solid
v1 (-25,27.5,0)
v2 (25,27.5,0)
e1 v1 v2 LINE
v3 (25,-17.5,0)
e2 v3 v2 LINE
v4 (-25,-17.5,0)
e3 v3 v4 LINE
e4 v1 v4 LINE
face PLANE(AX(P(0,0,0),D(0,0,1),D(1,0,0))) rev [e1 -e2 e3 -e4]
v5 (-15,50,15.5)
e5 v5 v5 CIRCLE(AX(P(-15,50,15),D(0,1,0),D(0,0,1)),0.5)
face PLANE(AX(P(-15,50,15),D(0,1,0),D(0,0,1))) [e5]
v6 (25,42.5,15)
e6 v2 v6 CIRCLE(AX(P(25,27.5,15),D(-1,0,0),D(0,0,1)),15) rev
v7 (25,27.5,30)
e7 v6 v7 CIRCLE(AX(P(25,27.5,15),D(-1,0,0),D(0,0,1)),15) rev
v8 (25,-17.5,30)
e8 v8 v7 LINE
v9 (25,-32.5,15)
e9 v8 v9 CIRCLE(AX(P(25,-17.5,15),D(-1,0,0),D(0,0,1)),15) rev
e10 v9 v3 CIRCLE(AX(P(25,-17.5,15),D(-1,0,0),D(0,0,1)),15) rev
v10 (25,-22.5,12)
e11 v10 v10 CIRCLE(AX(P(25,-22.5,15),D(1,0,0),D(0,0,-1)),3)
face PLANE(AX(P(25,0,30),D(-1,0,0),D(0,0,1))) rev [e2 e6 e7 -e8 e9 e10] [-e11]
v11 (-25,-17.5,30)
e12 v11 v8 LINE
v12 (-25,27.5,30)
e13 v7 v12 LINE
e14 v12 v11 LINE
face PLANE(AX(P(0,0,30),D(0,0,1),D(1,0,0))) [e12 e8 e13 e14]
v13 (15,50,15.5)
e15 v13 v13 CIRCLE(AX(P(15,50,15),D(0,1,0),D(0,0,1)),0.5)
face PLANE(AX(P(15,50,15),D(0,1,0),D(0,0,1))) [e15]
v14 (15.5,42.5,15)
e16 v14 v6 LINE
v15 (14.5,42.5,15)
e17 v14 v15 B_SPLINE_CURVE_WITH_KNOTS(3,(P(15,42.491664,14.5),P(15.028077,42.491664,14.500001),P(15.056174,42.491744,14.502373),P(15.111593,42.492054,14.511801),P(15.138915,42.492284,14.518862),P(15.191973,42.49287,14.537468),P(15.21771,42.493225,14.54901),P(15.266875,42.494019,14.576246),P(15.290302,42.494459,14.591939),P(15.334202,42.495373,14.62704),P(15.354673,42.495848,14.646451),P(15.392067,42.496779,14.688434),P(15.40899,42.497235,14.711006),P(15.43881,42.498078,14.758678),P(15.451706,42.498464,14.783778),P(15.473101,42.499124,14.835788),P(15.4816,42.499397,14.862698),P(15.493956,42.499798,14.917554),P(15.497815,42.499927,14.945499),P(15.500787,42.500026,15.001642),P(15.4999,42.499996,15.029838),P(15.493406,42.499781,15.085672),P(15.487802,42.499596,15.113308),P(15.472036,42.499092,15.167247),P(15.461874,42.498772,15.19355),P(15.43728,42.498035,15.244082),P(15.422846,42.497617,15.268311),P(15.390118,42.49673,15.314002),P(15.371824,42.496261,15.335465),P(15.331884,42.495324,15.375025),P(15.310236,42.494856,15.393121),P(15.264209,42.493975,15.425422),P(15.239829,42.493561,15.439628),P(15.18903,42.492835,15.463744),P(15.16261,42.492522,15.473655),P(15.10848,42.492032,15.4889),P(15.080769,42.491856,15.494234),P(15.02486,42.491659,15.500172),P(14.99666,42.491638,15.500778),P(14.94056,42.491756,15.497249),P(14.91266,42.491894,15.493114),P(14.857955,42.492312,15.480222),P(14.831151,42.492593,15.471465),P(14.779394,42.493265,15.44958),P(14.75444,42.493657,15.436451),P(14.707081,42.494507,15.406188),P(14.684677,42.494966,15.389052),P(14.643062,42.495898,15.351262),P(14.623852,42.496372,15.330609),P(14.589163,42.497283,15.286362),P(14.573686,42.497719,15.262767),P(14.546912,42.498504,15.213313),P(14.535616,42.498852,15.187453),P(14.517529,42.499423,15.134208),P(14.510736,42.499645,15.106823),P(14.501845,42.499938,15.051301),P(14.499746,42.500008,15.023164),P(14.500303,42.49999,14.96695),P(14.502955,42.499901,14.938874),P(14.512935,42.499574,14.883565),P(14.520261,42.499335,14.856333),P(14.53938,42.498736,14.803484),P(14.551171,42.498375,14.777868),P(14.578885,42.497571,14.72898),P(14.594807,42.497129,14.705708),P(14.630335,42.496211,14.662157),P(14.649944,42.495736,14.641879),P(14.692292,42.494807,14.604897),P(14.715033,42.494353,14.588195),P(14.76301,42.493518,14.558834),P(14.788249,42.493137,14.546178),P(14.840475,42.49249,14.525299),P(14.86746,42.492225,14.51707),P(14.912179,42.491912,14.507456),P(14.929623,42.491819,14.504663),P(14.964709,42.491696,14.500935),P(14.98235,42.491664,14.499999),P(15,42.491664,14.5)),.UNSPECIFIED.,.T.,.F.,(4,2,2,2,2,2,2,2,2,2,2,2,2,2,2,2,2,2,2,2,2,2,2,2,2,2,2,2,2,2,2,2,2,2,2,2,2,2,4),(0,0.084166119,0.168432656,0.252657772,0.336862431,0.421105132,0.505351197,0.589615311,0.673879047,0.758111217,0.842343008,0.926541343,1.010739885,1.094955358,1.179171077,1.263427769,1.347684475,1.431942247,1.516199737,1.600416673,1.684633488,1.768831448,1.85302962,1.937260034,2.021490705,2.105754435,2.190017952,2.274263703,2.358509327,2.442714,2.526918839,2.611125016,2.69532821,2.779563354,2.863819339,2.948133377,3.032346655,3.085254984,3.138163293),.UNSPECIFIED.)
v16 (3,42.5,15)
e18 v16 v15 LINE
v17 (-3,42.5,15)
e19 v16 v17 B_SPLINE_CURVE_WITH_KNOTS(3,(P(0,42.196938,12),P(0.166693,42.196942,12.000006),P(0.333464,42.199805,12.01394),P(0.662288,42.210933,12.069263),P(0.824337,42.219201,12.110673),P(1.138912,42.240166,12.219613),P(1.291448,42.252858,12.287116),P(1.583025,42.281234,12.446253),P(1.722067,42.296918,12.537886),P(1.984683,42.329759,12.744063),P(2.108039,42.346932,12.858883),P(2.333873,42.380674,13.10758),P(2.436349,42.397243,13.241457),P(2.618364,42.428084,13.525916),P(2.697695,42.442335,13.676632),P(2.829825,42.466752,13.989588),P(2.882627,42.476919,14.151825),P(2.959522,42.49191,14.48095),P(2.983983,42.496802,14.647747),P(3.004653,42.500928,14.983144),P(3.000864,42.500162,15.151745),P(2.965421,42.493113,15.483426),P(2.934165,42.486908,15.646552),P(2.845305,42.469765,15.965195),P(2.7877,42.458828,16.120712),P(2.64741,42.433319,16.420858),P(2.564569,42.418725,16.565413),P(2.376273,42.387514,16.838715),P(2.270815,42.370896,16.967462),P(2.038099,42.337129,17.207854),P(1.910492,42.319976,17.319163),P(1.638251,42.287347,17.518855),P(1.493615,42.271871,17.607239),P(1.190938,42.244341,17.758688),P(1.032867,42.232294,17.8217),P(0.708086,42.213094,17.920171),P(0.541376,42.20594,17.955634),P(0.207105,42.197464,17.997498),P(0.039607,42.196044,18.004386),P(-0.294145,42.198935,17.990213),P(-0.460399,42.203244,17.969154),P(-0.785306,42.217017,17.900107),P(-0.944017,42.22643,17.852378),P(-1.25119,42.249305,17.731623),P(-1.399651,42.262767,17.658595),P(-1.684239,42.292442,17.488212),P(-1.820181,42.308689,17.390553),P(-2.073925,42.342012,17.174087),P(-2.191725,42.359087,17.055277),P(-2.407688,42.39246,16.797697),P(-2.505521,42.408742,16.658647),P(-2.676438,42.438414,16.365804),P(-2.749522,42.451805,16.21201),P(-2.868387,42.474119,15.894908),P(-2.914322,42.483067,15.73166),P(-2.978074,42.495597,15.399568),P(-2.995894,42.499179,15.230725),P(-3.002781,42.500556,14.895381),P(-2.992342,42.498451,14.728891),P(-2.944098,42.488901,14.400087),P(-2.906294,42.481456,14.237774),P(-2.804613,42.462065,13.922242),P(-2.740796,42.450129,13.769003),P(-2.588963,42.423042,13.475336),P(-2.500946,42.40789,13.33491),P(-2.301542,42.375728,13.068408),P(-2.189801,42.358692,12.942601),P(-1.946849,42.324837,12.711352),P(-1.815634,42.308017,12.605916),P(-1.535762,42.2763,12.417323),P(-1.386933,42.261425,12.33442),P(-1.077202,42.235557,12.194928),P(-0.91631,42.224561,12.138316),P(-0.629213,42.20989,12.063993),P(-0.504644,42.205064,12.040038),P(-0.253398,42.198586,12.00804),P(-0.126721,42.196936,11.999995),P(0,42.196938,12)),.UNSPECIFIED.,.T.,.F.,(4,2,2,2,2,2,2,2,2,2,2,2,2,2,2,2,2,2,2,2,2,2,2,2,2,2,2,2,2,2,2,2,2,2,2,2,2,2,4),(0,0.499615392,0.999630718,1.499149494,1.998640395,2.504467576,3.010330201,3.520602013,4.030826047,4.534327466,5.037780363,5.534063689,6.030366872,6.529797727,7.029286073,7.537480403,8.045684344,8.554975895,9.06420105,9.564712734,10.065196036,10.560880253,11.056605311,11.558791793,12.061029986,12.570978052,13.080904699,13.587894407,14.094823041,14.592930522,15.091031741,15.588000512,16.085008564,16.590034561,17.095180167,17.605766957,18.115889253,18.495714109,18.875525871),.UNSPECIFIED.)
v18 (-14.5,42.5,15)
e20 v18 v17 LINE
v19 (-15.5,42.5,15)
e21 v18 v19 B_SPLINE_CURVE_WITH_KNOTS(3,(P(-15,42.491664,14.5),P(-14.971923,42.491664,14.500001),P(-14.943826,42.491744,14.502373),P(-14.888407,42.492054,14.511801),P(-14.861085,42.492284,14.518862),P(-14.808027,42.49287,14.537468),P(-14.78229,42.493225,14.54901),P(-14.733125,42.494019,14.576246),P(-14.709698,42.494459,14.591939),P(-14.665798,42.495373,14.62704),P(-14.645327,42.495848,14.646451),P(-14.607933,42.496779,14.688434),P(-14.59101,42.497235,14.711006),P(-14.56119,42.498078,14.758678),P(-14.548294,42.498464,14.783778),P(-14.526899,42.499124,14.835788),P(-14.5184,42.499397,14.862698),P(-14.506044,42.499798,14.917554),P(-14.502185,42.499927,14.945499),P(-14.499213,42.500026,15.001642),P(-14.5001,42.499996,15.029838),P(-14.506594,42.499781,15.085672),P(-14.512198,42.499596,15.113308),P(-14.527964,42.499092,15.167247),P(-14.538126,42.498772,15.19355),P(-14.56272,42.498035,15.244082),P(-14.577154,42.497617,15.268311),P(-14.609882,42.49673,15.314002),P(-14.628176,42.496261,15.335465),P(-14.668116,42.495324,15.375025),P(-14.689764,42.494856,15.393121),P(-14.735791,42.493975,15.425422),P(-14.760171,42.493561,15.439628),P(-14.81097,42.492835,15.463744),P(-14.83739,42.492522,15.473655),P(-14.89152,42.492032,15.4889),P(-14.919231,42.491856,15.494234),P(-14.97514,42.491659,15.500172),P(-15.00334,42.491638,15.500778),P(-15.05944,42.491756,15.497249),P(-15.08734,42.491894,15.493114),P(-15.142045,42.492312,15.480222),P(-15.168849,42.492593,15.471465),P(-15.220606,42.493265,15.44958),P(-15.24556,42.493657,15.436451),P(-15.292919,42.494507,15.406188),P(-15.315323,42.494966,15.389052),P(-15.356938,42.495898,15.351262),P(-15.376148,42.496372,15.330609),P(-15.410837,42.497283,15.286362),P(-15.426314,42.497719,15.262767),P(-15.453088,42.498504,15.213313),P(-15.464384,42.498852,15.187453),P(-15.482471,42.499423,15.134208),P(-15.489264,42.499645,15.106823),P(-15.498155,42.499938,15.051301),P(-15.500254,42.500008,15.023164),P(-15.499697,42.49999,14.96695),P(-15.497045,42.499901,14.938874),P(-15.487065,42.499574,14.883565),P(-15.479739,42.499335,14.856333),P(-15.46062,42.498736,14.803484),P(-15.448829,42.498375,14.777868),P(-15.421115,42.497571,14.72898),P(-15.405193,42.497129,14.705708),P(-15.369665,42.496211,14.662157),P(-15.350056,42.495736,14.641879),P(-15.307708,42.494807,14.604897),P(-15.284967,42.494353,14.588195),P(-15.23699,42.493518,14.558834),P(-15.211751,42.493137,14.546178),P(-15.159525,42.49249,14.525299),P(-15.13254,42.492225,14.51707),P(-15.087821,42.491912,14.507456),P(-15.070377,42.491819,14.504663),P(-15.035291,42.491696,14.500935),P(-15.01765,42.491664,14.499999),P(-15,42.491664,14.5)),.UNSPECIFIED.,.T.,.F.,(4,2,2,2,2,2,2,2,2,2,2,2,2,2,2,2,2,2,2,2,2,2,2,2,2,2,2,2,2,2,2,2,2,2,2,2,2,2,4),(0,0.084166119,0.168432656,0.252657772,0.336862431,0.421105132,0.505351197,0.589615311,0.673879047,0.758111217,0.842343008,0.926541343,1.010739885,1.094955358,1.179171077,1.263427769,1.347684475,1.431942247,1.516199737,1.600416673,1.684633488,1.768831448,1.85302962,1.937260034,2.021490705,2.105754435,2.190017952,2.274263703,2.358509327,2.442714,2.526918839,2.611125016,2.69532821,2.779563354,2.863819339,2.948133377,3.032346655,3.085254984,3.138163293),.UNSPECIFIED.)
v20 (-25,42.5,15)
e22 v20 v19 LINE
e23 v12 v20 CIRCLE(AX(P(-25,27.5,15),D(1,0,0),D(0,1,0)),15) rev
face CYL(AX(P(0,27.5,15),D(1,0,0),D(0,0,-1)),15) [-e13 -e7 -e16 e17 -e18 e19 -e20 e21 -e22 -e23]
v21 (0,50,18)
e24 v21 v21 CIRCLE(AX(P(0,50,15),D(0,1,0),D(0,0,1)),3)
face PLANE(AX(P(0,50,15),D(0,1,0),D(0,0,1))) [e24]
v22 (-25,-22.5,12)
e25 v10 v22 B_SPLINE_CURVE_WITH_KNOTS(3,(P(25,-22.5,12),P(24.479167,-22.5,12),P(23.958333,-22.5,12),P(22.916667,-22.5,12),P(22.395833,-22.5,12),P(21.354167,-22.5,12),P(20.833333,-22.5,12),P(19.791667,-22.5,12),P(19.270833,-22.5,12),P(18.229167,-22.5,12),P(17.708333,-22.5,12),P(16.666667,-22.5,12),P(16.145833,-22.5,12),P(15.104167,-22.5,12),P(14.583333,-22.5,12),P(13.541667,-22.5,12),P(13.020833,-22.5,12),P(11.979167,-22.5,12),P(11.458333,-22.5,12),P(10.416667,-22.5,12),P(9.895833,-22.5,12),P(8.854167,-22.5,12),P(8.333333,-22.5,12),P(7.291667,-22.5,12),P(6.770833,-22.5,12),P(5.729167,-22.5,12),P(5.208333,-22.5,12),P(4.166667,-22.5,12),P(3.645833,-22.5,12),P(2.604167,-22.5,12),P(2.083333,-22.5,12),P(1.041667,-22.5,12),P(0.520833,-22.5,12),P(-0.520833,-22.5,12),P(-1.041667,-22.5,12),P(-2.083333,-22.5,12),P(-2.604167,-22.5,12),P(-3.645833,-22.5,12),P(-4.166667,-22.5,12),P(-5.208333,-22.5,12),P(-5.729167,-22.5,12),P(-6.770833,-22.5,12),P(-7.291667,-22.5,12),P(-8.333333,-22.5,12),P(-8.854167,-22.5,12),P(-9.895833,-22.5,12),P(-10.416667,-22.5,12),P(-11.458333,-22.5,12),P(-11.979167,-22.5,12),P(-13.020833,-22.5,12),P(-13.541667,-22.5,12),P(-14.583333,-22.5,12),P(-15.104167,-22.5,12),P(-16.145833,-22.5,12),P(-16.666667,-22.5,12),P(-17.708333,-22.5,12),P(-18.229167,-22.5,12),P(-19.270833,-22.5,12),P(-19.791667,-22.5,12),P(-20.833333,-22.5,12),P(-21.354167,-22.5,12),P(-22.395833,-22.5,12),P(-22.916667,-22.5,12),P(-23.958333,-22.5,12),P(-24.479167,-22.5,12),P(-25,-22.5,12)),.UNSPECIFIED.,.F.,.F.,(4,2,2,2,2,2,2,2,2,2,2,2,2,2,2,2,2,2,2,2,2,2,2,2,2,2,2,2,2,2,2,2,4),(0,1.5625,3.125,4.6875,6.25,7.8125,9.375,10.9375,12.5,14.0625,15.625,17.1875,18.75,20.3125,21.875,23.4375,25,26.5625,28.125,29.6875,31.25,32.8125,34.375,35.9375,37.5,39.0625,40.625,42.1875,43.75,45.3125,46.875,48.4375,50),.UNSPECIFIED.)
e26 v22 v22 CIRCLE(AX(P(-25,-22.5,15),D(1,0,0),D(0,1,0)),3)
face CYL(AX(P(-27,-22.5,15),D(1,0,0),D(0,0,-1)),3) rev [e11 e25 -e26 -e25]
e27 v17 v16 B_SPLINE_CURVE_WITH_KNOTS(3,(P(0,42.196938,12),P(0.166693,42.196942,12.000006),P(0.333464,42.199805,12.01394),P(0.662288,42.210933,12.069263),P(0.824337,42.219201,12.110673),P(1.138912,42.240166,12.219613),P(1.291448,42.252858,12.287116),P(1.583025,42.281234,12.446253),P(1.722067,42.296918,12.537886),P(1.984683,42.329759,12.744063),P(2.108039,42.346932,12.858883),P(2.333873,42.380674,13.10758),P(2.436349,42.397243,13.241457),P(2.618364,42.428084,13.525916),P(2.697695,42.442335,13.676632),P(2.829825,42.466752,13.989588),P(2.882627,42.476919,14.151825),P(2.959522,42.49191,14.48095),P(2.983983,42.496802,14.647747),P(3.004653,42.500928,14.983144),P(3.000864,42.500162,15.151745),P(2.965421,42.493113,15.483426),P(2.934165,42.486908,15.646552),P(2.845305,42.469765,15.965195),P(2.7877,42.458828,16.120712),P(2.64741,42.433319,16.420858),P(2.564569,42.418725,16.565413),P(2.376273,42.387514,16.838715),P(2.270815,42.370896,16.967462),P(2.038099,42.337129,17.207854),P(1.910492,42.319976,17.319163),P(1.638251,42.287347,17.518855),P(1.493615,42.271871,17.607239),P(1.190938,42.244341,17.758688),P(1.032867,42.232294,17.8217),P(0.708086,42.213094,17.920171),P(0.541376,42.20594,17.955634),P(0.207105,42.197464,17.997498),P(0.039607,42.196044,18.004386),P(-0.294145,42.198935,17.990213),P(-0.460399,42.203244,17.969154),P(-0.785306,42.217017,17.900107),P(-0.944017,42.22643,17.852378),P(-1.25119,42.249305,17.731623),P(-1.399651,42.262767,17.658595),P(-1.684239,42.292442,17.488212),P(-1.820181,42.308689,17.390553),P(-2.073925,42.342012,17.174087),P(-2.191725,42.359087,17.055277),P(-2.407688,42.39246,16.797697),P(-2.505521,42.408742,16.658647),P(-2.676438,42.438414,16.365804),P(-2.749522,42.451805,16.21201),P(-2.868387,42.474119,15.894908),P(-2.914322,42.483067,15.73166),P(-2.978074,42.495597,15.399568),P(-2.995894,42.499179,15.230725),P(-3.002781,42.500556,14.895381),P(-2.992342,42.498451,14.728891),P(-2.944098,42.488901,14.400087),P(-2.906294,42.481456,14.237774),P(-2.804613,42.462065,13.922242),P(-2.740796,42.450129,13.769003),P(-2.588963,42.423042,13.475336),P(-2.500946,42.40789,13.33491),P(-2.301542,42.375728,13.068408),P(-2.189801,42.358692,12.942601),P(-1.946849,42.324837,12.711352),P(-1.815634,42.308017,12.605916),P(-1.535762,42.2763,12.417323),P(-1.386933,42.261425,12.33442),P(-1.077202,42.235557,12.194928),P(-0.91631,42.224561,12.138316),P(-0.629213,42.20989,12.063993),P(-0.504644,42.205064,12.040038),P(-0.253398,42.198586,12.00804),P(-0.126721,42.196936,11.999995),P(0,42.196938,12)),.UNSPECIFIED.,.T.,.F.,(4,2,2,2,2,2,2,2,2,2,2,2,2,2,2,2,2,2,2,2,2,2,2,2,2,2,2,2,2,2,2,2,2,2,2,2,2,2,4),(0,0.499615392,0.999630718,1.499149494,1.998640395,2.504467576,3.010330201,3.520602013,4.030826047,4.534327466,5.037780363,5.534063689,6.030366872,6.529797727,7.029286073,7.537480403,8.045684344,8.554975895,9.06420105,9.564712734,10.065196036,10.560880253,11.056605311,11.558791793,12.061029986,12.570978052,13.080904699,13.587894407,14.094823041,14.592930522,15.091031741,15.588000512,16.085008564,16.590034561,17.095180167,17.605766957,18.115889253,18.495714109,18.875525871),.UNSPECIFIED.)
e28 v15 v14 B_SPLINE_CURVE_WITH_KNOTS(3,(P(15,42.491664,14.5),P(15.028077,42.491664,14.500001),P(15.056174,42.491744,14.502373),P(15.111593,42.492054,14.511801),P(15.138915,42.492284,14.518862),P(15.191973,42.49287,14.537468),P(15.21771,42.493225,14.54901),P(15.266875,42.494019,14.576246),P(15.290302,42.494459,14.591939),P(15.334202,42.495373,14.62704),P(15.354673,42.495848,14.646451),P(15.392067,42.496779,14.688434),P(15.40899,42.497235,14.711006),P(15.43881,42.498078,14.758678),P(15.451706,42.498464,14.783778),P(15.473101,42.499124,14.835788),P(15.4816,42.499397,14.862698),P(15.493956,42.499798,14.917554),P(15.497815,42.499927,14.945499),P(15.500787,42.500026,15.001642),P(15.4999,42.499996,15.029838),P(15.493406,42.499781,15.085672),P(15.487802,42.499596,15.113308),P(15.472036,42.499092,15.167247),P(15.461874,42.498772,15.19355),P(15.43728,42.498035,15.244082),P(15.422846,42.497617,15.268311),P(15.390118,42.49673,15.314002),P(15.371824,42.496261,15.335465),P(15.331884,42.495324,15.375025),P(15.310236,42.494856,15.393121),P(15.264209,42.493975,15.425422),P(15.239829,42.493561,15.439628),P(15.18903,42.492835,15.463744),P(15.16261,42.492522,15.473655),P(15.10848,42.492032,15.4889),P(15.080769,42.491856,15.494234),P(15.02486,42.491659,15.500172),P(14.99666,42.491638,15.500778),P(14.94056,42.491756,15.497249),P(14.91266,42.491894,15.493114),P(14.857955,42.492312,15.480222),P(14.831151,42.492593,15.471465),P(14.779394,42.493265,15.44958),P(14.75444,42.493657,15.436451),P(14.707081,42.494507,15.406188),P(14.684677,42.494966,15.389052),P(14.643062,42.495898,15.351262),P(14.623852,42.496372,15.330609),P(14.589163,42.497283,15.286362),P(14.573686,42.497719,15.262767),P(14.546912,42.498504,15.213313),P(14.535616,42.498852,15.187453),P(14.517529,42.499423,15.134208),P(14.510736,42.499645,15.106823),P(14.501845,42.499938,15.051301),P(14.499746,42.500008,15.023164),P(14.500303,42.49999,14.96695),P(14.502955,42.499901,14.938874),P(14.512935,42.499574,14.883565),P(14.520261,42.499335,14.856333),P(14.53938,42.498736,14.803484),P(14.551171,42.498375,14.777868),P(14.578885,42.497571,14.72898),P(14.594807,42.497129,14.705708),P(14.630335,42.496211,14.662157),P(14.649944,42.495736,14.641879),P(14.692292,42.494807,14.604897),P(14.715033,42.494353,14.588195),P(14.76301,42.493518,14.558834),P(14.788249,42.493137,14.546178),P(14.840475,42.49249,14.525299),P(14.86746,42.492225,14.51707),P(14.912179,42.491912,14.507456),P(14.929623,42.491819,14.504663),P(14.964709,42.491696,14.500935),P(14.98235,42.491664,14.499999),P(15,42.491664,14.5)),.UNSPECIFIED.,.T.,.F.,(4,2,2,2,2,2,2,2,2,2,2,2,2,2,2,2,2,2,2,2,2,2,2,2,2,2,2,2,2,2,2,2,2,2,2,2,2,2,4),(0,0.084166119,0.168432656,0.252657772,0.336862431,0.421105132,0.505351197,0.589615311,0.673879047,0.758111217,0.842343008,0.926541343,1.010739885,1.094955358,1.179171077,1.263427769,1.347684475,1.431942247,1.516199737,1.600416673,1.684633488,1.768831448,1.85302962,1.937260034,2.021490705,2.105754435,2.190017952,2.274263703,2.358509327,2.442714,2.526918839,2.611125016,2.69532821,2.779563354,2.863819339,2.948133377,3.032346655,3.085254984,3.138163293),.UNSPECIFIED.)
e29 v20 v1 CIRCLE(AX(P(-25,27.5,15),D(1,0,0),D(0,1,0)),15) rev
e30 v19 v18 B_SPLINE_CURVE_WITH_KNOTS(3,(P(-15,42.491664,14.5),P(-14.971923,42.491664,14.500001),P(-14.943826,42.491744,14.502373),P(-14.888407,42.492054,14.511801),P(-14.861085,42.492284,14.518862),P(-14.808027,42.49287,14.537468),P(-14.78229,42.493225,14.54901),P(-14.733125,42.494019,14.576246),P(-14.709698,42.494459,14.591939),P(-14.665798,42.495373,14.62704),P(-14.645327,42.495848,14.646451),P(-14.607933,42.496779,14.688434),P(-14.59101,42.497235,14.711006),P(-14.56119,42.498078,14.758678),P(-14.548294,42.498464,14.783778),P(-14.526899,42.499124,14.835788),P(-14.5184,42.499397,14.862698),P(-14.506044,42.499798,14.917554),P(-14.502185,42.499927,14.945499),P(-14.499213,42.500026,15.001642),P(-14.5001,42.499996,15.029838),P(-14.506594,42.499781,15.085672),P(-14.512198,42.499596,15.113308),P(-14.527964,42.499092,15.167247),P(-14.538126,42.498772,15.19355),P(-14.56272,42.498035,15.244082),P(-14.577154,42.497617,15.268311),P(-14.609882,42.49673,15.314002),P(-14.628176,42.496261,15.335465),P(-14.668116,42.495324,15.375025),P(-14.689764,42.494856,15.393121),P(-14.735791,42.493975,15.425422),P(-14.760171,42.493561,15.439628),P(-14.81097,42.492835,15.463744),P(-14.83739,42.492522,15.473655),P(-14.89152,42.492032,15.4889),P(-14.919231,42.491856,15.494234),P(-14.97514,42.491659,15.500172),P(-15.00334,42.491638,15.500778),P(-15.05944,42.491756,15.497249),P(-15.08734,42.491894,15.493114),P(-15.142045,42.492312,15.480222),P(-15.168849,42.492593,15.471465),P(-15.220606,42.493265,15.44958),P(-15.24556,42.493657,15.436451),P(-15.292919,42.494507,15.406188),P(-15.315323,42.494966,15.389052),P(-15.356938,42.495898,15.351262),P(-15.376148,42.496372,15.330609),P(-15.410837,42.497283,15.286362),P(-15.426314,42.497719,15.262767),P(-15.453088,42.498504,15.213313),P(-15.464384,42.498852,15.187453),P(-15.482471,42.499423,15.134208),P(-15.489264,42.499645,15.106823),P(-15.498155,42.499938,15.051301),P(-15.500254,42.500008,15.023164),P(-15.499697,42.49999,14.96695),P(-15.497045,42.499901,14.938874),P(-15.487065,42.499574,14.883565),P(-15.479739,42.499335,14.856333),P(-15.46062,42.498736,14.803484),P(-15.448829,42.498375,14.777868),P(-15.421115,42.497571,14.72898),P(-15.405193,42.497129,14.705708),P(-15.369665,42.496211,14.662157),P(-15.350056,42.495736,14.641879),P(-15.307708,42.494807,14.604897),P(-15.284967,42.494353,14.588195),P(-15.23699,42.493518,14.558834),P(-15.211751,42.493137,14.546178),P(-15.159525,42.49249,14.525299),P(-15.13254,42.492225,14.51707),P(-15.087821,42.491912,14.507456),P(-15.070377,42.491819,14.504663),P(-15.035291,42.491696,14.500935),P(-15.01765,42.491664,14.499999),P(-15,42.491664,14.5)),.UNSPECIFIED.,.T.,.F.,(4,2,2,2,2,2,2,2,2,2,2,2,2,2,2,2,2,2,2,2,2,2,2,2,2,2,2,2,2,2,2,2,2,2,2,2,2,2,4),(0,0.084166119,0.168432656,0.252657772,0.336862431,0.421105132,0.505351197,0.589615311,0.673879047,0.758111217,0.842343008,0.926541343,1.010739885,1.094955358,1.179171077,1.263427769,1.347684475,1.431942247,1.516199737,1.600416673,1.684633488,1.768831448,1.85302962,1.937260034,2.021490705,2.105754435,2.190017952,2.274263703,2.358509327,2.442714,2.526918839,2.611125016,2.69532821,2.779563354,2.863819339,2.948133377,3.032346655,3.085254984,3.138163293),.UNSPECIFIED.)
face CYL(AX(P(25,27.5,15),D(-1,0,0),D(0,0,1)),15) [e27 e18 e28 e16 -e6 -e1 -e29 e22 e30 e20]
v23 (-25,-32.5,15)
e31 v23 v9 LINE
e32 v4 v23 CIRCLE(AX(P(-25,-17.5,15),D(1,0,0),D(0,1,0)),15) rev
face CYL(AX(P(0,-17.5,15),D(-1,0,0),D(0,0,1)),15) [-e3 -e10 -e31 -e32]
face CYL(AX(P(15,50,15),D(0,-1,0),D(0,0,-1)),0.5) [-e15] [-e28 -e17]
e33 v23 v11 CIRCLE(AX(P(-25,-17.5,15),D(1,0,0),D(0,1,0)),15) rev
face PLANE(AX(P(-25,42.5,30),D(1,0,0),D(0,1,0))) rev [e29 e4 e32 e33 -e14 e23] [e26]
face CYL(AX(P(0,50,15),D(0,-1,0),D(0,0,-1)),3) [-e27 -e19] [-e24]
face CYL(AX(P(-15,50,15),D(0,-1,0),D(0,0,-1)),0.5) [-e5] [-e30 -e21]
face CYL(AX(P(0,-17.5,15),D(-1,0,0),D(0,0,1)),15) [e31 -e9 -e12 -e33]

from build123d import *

# Parameters (mm, degrees)
EXTRUDE_1_DEPTH     = 30
SKETCH_2_R          = 3
CUT_EXTRUDE_1_DEPTH = 52
FILLET_1_R          = 15
FILLET_2_R          = 15
FILLET_3_R          = 15
FILLET_4_R          = 15
SKETCH_4_R          = 3
SKETCH_4_R_2        = 0.5
EXTRUDE_2_DEPTH     = 50


with BuildPart() as part:
    # 草图1 → 凸台-拉伸1 (new body)
    with BuildSketch(Plane.XY):
        Polygon((25, 0), (25, 42.5), (-25, 42.5), (-25, -32.5), (25, -32.5), align=None)
    extrude(amount=EXTRUDE_1_DEPTH)

    # 草图2 → 切除-拉伸1 (cut)
    with BuildSketch(Plane(origin=(25, 0, 0), x_dir=(0, 0, -1), z_dir=(1, 0, 0))):
        with Locations((-15, -22.5)):
            Circle(SKETCH_2_R)
    extrude(amount=-CUT_EXTRUDE_1_DEPTH, mode=Mode.SUBTRACT)

    # 圆角1
    fillet_1_edges = [part.edges().sort_by_distance(p)[0] for p in [
        (0, -32.5, 0),
    ]]
    fillet(fillet_1_edges, radius=FILLET_1_R)

    # 圆角2
    fillet_2_edges = [part.edges().sort_by_distance(p)[0] for p in [
        (0, -32.5, 30),
    ]]
    fillet(fillet_2_edges, radius=FILLET_2_R - 0.0001)  # a hair under: the kernel refuses the full size

    # 圆角3
    fillet_3_edges = [part.edges().sort_by_distance(p)[0] for p in [
        (0, 42.5, 30),
    ]]
    fillet(fillet_3_edges, radius=FILLET_3_R)

    # 圆角4
    fillet_4_edges = [part.edges().sort_by_distance(p)[0] for p in [
        (0, 42.5, 0),
    ]]
    fillet(fillet_4_edges, radius=FILLET_4_R - 0.0001)  # a hair under: the kernel refuses the full size

    # 草图4 → 凸台-拉伸2 (add)
    with BuildSketch(Plane(origin=(0, 0, 0), x_dir=(1, 0, 0), z_dir=(0, 1, 0))):
        with Locations((0, -15)):
            Circle(SKETCH_4_R)
        with Locations((15, -15)):
            Circle(SKETCH_4_R_2)
        with Locations((-15, -15)):
            Circle(SKETCH_4_R_2)
    extrude(amount=EXTRUDE_2_DEPTH)


solid = part.part
